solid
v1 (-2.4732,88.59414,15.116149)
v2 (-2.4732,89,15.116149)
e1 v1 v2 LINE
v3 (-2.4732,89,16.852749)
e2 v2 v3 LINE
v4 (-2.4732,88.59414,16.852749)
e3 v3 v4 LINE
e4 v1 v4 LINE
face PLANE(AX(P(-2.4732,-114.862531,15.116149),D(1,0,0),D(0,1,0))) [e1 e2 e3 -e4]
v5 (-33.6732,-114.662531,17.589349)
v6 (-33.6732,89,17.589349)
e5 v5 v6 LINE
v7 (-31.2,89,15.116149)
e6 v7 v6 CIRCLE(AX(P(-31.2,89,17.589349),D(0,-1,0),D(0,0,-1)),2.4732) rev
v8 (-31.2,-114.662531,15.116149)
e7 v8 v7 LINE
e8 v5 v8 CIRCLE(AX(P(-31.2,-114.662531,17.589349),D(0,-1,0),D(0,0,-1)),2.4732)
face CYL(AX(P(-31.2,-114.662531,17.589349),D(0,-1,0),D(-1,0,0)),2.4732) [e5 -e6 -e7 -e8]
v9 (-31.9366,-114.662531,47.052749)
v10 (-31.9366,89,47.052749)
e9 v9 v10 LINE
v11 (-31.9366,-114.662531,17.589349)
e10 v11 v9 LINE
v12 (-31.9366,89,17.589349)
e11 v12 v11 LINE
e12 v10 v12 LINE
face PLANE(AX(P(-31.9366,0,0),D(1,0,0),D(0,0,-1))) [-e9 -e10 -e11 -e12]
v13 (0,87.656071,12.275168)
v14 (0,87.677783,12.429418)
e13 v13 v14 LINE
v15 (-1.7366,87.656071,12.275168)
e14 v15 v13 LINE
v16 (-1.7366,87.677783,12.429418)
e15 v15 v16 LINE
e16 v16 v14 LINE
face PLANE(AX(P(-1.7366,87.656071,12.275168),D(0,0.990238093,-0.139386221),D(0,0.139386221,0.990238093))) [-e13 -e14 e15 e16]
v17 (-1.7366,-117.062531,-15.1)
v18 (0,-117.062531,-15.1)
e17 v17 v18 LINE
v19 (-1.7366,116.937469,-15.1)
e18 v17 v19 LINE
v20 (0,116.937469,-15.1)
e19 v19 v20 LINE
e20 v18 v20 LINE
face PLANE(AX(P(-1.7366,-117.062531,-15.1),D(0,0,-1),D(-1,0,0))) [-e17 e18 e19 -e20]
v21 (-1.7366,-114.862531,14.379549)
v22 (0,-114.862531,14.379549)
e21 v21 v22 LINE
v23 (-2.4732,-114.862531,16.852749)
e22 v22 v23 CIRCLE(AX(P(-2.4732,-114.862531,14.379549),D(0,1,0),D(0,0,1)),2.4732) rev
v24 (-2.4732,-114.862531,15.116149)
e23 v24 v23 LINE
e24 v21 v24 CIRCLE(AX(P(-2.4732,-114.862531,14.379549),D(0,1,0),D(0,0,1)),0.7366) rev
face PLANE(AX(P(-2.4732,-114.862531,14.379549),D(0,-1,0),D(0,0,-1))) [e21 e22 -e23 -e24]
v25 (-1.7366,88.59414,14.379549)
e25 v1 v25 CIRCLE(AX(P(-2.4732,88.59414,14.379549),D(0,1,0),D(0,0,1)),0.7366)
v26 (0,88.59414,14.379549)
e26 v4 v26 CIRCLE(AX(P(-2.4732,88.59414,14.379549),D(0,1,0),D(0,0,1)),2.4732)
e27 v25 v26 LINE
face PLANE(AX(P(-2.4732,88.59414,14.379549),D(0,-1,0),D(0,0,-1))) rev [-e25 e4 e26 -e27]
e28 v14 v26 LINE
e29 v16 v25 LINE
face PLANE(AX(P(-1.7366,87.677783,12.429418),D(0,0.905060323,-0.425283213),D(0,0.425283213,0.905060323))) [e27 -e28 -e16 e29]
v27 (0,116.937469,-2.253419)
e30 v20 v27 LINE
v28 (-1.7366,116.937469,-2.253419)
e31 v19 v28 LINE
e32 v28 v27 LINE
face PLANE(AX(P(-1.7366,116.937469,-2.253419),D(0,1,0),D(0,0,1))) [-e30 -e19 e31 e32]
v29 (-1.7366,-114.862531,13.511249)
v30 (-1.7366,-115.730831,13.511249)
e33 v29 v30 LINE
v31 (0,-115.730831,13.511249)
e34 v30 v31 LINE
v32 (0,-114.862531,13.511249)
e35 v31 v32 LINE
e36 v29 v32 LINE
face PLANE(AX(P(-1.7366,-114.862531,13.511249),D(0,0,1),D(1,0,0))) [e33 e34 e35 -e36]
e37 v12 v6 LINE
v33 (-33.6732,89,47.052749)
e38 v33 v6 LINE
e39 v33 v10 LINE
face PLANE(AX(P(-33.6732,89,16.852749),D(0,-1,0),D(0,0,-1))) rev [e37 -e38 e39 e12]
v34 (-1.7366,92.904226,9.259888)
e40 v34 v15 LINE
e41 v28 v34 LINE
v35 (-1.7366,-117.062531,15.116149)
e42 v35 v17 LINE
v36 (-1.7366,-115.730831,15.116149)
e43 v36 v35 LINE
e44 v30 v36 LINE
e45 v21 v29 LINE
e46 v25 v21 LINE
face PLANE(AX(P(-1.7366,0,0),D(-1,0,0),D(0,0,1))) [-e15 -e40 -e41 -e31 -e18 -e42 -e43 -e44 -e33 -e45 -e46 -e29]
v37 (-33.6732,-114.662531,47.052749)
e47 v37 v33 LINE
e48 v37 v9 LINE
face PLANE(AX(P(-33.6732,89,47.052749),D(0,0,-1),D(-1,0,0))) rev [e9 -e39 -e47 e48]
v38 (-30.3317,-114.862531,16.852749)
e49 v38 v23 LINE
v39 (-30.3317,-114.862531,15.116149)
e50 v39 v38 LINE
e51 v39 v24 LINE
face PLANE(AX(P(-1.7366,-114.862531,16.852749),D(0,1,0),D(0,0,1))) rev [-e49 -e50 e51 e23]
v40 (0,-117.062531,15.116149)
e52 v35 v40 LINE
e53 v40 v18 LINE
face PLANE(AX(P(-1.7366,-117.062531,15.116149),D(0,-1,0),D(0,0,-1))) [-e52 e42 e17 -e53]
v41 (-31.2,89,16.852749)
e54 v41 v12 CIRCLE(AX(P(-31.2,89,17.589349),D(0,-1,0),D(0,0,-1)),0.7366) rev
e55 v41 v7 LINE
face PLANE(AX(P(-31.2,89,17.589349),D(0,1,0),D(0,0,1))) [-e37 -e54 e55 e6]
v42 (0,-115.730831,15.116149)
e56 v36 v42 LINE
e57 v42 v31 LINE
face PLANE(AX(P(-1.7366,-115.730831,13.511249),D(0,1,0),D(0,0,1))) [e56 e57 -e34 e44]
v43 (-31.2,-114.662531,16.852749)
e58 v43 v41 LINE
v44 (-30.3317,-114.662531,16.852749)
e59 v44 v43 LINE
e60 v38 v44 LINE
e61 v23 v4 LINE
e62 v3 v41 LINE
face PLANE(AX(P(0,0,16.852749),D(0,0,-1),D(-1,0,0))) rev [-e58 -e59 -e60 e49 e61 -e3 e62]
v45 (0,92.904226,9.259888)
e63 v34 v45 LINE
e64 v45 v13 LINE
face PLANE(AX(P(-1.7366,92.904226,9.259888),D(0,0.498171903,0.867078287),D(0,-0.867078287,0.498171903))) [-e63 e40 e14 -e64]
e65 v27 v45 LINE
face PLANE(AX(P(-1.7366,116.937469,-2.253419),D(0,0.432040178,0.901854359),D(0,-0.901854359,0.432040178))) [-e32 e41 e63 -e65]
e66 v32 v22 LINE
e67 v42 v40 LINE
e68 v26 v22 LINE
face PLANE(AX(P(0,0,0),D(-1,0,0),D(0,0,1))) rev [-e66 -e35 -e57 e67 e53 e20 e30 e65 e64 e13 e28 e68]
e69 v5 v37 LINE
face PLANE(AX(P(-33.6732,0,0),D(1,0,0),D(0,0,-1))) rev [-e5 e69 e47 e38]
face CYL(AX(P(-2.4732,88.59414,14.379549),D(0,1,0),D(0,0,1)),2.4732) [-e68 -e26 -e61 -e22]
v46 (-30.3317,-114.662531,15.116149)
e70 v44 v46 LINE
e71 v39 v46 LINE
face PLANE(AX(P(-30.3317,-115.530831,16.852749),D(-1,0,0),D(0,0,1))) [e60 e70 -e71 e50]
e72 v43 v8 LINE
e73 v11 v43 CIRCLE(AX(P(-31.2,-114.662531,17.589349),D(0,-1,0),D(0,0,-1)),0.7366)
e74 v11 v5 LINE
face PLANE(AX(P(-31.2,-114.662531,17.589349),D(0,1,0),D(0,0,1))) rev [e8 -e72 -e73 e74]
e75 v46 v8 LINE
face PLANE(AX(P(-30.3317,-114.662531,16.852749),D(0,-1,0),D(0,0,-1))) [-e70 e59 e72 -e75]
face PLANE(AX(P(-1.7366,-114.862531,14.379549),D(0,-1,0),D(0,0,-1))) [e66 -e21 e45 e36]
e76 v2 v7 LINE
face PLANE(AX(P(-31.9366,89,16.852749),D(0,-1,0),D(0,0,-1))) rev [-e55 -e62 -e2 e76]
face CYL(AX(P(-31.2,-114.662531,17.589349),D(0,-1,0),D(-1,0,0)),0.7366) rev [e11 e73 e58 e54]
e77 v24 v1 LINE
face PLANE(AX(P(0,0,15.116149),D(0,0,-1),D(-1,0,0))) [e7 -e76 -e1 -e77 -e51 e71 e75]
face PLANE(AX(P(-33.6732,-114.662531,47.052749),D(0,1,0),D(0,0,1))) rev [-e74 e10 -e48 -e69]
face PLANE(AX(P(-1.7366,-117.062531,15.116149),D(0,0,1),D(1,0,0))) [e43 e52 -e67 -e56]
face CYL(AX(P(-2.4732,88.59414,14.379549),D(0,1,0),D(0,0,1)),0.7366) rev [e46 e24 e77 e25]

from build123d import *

# Parameters (mm, degrees)
BASE_FLANGE1_DEPTH            = 1.7366
EDGE_FLANGE1_START            = -115.730831119
EDGE_FLANGE1_DEPTH            = 204.671095583
EDGE_FLANGE1_2_DEPTH          = 0.8683
EDGE_FLANGE1_START_2          = 88.594139894
EDGE_FLANGE1_3_DEPTH          = 0.34612457
EDGE_FLANGE1_START_3          = -114.862531119
EDGE_FLANGE1_4_DEPTH          = 203.456671013
EDGE_FLANGE1_5_OUTLINE_W      = 29.4634
EDGE_FLANGE1_5_OUTLINE_H      = 1.7366
EDGE_FLANGE1_5_DEPTH          = 0.405860106
EDGE_FLANGE2_STRIP_W          = 8.4196
EDGE_FLANGE2_STRIP_H          = 1.7366
EDGE_FLANGE2_STRIP_CUT_DEPTH  = 203.662531119
EDGE_FLANGE2_RELIEF_W         = 9.2879
EDGE_FLANGE2_RELIEF_H         = 0.8683
EDGE_FLANGE2_RELIEF_CUT_DEPTH = 1.7366
EDGE_FLANGE2_DEPTH            = 203.662531119


# Read off the part's stored shape, not the designer's step: Edge-Flange1
# Sheet-metal steps are written as plain solids
with BuildPart() as part:
    # Sketch1 → Base-Flange1 (new body)
    with BuildSketch(Plane(origin=(0, 0, 0), x_dir=(0, 0, -1), z_dir=(1, 0, 0))):
        Polygon((2.253419205, 116.937468881), (-9.259888049, 92.904226435), (-12.275167803, 87.656070952), (-12.429418016, 87.67778326), (-15.116149142, 88.940264464), (-15.116149142, -117.062531119), (15.1, -117.062531119), (15.1, 116.937468881), align=None)
    extrude(amount=-BASE_FLANGE1_DEPTH)

    # Edge-Flange1 outline → Edge-Flange1 (cut)
    with BuildSketch(Plane(origin=(0, 0, 0), x_dir=(1, 0, 0), z_dir=(0, 1, 0)).offset(EDGE_FLANGE1_START)):
        with BuildLine():
            Line((0, -15.116149142), (0, -14.379549142))
            ThreePointArc((0, -14.379549142), (-0.02822066, -14.752100167), (-0.112238611, -15.116149142))
            Line((-0.112238611, -15.116149142), (0, -15.116149142))
        make_face()
    extrude(amount=EDGE_FLANGE1_DEPTH, mode=Mode.SUBTRACT)

    # Edge-Flange1 2 outline → Edge-Flange1 2 (cut)
    with BuildSketch(Plane(origin=(0, 0, 0), x_dir=(1, 0, 0), z_dir=(0, 1, 0)).offset(EDGE_FLANGE1_START)):
        with BuildLine():
            Line((0, -13.511249142), (-1.7366, -13.511249142))
            Line((-1.7366, -13.511249142), (-1.7366, -15.116149142))
            Line((-1.7366, -15.116149142), (-0.112238611, -15.116149142))
            ThreePointArc((-0.112238611, -15.116149142), (-0.02822066, -14.752100167), (0, -14.379549142))
            Line((0, -14.379549142), (0, -13.511249142))
        make_face()
    extrude(amount=EDGE_FLANGE1_2_DEPTH, mode=Mode.SUBTRACT)

    # Edge-Flange1 3 outline → Edge-Flange1 3 (cut)
    with BuildSketch(Plane(origin=(0, 0, 0), x_dir=(1, 0, 0), z_dir=(0, 1, 0)).offset(EDGE_FLANGE1_START_2)):
        with BuildLine():
            Line((0, -13.511249142), (-1.7366, -13.511249142))
            Line((-1.7366, -13.511249142), (-1.7366, -15.116149142))
            Line((-1.7366, -15.116149142), (-0.112238611, -15.116149142))
            ThreePointArc((-0.112238611, -15.116149142), (-0.02822066, -14.752100167), (0, -14.379549142))
            Line((0, -14.379549142), (0, -13.511249142))
        make_face()
    extrude(amount=EDGE_FLANGE1_3_DEPTH, mode=Mode.SUBTRACT)

    # Edge-Flange1 4 outline → Edge-Flange1 4 (add)
    with BuildSketch(Plane(origin=(0, 0, 0), x_dir=(1, 0, 0), z_dir=(0, 1, 0)).offset(EDGE_FLANGE1_START_3)):
        with BuildLine():
            Line((-1.7366, -15.116149142), (-1.7366, -14.379549142))
            ThreePointArc((-1.7366, -14.379549142), (-1.952345145, -14.900403997), (-2.4732, -15.116149142))
            Line((-2.4732, -15.116149142), (-31.9366, -15.116149142))
            Line((-31.9366, -15.116149142), (-31.9366, -16.852749142))
            Line((-31.9366, -16.852749142), (-2.4732, -16.852749142))
            ThreePointArc((-2.4732, -16.852749142), (-1.007771885, -16.371843969), (-0.112238611, -15.116149142))
            Line((-0.112238611, -15.116149142), (-1.7366, -15.116149142))
        make_face()
    extrude(amount=EDGE_FLANGE1_4_DEPTH)

    # Edge-Flange1 5 outline → Edge-Flange1 5 (add)
    with BuildSketch(Plane(origin=(0, 0, 0), x_dir=(1, 0, 0), z_dir=(0, 1, 0)).offset(EDGE_FLANGE1_START_2)):
        with Locations((-17.2049, -15.984449142)):
            Rectangle(EDGE_FLANGE1_5_OUTLINE_W, EDGE_FLANGE1_5_OUTLINE_H)
    extrude(amount=EDGE_FLANGE1_5_DEPTH)

    # Edge-Flange2 strip (across the edge) → Edge-Flange2 strip cut (cut)
    with BuildSketch(Plane(origin=(-31.9366, 89, 16.852749142), x_dir=(1, 0, 0), z_dir=(0, -1, 0))):
        with Locations((-3.4732, -0.8683)):
            Rectangle(EDGE_FLANGE2_STRIP_W, EDGE_FLANGE2_STRIP_H)
    extrude(amount=EDGE_FLANGE2_STRIP_CUT_DEPTH, mode=Mode.SUBTRACT)

    # Edge-Flange2 relief (on the sheet) → Edge-Flange2 relief cut (cut)
    with BuildSketch(Plane(origin=(-31.2, 89, 16.852749142), x_dir=(1, 0, 0), z_dir=(0, 0, 1))):
        with Locations((-3.77565, -204.096681119)):
            Rectangle(EDGE_FLANGE2_RELIEF_W, EDGE_FLANGE2_RELIEF_H)
    extrude(amount=-EDGE_FLANGE2_RELIEF_CUT_DEPTH, mode=Mode.SUBTRACT)

    # Edge-Flange2 section (across the edge) → Edge-Flange2 (add)
    with BuildSketch(Plane(origin=(-31.9366, 89, 16.852749142), x_dir=(1, 0, 0), z_dir=(0, -1, 0))):
        with BuildLine():
            Line((-1.7366, 0.7366), (-1.7366, 30.2))
            Line((-1.7366, 30.2), (0, 30.2))
            Line((0, 30.2), (0, 0.7366))
            ThreePointArc((0, 0.7366), (0.215745145, 0.215745145), (0.7366, 0))
            Line((0.7366, 0), (0.7366, -1.7366))
            ThreePointArc((0.7366, -1.7366), (-1.012216491, -1.012216491), (-1.7366, 0.7366))
        make_face()
    extrude(amount=EDGE_FLANGE2_DEPTH)


solid = part.part
